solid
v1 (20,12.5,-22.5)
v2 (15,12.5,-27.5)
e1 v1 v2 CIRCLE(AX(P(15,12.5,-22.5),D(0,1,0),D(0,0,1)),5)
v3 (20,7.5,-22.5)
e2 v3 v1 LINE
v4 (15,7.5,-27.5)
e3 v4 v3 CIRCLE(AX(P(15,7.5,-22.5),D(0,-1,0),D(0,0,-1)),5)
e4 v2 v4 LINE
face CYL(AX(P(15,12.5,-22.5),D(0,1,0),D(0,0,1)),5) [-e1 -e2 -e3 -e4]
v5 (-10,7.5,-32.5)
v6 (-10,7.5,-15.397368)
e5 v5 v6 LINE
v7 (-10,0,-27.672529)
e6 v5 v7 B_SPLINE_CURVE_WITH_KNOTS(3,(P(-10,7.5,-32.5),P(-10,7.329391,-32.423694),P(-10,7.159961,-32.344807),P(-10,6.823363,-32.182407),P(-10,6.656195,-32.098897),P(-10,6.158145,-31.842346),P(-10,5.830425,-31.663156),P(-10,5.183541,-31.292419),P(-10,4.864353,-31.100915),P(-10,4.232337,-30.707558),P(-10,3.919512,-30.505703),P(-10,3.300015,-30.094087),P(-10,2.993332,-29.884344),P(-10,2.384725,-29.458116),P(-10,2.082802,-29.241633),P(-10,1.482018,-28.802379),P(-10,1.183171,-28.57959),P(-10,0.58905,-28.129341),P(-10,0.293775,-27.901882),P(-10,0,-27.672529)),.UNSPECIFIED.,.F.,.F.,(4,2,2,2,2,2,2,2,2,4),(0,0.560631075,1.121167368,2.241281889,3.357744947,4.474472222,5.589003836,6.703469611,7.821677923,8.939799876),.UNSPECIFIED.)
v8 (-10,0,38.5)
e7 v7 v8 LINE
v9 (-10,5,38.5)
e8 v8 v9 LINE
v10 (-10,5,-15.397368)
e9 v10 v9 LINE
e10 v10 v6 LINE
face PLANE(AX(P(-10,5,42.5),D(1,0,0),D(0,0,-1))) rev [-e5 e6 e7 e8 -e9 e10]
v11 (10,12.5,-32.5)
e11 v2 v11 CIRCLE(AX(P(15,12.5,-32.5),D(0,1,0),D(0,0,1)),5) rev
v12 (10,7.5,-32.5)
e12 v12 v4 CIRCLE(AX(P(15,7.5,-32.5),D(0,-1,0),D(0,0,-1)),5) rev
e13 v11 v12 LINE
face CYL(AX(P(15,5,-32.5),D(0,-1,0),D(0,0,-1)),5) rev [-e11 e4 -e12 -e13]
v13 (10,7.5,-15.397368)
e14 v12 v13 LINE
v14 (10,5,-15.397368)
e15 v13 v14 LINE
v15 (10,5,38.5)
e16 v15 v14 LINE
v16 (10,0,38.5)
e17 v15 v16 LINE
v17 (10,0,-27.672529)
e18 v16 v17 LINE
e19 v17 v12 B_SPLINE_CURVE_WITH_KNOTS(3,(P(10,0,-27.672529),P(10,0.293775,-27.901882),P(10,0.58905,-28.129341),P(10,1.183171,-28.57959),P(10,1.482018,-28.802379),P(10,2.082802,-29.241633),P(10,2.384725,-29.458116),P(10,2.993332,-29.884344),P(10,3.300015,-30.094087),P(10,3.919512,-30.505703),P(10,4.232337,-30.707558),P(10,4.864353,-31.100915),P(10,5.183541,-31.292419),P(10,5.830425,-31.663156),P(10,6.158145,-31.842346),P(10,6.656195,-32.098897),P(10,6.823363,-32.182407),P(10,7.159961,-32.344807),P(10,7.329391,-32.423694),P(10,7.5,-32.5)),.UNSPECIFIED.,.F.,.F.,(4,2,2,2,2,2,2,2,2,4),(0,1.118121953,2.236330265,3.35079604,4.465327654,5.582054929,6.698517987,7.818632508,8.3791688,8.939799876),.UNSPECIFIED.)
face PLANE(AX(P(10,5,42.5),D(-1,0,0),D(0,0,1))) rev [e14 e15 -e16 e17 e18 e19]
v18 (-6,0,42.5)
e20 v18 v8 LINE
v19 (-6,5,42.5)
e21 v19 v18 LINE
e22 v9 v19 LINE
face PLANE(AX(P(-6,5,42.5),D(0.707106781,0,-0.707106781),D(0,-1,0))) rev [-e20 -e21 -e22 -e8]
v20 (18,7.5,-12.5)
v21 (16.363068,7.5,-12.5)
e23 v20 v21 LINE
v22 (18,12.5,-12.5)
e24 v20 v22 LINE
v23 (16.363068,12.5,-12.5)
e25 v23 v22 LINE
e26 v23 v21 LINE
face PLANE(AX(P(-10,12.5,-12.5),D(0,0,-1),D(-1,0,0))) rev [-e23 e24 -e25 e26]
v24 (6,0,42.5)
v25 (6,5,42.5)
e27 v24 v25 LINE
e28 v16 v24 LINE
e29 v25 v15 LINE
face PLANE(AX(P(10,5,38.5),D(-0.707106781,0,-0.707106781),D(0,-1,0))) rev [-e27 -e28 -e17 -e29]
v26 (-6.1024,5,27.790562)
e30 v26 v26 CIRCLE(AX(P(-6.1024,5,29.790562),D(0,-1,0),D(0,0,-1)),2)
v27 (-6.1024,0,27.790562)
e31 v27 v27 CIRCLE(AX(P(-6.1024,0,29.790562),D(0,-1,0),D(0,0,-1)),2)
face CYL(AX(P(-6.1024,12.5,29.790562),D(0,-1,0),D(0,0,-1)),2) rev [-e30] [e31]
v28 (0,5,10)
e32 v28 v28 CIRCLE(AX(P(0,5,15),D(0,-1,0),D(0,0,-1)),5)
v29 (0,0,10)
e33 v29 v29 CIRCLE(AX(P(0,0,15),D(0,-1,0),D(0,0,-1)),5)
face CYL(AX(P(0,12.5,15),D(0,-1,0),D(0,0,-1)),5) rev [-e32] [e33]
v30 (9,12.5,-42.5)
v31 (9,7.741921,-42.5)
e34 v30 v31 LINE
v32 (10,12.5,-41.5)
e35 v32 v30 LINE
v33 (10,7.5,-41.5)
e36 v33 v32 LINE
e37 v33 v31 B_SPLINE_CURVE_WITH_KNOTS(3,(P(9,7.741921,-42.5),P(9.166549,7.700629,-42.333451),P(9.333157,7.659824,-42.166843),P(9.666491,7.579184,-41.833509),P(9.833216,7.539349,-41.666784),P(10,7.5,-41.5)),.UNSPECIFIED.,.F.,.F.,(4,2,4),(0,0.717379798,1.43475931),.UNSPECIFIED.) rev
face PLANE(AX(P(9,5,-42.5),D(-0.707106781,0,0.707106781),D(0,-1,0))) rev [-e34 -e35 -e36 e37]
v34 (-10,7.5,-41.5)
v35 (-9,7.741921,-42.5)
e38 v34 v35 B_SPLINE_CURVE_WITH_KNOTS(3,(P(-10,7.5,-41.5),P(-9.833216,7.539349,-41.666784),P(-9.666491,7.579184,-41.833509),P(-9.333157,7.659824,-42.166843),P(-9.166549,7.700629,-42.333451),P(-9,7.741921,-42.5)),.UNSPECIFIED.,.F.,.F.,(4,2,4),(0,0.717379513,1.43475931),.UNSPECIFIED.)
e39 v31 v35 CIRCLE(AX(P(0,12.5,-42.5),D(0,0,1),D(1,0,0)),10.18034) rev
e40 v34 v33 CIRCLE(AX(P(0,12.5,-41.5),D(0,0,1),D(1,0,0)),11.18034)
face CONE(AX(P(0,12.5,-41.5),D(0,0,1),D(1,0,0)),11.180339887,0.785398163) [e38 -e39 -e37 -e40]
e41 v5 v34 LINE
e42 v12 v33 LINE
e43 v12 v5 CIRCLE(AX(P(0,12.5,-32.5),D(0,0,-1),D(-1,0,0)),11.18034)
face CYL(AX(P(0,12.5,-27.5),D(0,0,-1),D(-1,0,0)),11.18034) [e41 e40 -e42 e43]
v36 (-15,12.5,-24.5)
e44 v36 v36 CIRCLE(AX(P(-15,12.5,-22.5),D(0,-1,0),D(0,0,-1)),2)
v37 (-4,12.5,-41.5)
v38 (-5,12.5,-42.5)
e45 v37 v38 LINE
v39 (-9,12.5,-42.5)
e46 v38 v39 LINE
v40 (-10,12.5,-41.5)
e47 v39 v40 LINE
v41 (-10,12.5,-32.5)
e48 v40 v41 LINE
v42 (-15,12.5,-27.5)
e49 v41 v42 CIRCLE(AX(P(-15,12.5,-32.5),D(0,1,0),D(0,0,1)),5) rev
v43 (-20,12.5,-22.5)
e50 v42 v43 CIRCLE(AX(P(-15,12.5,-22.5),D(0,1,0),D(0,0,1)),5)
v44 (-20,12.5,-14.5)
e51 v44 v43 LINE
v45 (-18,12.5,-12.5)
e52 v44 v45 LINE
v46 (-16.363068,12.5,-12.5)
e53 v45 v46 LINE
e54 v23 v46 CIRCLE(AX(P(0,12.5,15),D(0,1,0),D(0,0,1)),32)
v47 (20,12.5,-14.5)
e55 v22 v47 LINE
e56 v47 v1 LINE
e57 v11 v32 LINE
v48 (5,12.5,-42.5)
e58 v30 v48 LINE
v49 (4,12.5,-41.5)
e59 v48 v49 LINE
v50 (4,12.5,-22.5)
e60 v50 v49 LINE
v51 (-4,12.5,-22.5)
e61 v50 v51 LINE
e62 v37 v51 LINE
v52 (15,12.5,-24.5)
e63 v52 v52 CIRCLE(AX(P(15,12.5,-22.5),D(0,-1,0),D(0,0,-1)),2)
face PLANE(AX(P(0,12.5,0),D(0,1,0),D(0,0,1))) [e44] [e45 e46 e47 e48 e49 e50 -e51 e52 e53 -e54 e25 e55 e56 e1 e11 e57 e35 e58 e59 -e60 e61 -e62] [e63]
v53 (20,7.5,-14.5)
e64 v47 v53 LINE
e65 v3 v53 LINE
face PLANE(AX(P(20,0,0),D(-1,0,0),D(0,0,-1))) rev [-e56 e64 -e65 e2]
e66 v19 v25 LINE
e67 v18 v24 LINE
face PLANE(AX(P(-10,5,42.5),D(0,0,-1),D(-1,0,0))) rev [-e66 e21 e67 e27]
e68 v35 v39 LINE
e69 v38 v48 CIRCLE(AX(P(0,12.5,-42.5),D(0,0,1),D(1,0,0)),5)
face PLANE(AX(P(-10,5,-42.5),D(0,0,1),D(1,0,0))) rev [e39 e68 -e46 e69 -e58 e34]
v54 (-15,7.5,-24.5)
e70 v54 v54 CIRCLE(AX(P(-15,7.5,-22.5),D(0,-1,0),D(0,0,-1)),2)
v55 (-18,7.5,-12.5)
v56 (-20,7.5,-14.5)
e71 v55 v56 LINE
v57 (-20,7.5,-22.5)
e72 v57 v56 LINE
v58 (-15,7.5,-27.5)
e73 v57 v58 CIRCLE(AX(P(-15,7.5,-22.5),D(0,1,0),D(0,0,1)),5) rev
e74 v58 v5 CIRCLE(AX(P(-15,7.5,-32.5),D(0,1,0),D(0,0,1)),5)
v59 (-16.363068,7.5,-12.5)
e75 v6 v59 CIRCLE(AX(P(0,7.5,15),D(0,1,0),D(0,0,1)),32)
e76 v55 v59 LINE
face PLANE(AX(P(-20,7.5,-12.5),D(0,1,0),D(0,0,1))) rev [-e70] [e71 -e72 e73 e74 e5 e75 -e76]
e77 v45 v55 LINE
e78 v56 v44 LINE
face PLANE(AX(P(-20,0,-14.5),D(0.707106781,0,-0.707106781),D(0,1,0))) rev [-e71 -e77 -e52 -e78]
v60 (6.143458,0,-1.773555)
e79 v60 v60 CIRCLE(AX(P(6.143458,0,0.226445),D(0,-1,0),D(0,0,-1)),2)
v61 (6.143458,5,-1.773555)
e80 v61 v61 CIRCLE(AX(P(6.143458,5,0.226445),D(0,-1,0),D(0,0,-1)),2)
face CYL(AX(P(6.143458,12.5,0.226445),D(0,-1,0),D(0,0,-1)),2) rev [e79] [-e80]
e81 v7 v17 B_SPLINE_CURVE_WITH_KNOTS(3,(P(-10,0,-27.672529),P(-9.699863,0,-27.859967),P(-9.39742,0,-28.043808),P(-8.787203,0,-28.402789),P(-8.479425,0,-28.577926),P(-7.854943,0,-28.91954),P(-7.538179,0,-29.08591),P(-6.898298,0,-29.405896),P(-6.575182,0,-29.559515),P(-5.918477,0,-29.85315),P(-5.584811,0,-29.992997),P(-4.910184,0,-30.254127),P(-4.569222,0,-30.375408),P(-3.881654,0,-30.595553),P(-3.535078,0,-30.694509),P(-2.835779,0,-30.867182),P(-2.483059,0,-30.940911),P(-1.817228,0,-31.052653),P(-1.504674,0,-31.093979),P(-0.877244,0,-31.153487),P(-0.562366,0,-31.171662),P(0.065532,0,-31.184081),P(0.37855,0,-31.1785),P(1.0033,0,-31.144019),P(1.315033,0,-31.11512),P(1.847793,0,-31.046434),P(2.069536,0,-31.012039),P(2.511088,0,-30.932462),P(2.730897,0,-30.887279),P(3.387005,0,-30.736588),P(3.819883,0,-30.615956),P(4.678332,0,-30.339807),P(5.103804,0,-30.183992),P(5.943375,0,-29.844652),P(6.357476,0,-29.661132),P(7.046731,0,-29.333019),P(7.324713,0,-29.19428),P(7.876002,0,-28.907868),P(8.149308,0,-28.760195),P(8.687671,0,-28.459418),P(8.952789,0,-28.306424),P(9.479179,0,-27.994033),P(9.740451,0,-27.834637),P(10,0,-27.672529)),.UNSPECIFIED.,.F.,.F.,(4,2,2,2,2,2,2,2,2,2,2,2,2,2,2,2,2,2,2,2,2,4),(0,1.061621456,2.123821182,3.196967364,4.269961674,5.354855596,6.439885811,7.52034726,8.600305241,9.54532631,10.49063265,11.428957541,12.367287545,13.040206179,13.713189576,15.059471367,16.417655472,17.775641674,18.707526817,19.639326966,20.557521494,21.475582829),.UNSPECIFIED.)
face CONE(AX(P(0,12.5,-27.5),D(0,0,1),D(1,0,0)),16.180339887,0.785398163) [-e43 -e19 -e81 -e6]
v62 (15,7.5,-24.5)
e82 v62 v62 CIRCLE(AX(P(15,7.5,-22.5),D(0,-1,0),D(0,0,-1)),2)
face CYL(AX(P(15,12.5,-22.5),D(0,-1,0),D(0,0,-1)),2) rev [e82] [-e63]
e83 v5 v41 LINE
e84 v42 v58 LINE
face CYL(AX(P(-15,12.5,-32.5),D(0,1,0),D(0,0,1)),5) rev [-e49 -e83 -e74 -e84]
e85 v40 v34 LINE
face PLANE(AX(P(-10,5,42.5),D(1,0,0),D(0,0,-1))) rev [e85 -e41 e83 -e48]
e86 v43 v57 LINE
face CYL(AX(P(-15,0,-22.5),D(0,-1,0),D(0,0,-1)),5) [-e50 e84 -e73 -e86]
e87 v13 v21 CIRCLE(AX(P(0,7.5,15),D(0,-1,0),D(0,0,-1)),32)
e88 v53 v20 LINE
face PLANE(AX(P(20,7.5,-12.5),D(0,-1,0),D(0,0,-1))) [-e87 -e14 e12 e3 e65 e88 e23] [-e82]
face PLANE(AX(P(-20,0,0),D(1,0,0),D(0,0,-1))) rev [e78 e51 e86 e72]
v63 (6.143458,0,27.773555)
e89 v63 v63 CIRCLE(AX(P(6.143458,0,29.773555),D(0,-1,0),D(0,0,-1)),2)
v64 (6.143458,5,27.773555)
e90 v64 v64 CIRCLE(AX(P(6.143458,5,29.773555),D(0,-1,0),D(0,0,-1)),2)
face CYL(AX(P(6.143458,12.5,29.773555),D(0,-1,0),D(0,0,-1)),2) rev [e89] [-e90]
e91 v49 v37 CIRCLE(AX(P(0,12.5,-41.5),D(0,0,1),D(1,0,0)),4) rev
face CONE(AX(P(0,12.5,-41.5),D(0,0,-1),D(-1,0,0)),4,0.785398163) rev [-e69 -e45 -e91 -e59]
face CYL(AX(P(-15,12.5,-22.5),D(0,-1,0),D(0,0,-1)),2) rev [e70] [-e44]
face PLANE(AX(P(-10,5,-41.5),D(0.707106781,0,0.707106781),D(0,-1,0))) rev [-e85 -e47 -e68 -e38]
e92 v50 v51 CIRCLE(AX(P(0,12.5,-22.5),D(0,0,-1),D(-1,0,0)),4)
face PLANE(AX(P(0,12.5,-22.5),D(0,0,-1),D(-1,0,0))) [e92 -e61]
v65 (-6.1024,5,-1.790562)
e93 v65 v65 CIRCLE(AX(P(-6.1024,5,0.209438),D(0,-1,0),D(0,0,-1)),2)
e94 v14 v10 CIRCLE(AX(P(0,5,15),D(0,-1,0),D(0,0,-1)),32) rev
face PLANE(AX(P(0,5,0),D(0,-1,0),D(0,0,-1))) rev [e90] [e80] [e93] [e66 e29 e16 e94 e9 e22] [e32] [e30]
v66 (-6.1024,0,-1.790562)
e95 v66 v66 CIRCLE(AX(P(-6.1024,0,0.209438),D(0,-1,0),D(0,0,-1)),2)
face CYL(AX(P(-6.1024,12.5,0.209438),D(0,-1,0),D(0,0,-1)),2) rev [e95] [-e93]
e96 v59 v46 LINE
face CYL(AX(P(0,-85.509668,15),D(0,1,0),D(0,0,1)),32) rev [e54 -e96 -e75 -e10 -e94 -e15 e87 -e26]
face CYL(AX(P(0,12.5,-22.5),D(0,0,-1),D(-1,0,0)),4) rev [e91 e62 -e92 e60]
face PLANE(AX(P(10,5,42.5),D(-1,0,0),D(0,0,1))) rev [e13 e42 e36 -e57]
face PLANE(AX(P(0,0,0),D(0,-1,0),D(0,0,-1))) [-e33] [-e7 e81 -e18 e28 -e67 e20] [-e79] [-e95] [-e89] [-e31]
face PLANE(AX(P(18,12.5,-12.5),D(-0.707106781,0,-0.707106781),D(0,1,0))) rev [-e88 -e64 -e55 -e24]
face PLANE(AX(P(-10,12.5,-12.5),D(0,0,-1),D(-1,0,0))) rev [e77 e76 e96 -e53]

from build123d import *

# Parameters (mm, degrees)
SKETCH4_W           = 20
SKETCH4_H           = 85
BOSS_EXTRUDE6_DEPTH = 5
SKETCH5_W           = 20
SKETCH5_H           = 30
BOSS_EXTRUDE7_DEPTH = 7.5
SKETCH6_R           = 4
CUT_EXTRUDE1_DEPTH  = 20
SKETCH7_W           = 15
SKETCH7_H           = 5
BOSS_EXTRUDE8_DEPTH = 10
FILLET2_START       = 7.5
FILLET2_DEPTH       = 5
FILLET2_2_DEPTH     = 5
SKETCH8_R           = 2
CUT_EXTRUDE2_DEPTH  = 48.565743976
CUT_EXTRUDE4_DEPTH  = 15
CHAMFER4_SIZE       = 5
CHAMFER7_SIZE       = 1
CHAMFER8_SIZE       = 1
SKETCH10_R          = 2
SKETCH10_R_2        = 5
CUT_EXTRUDE5_DEPTH  = 49.605555238
CHAMFER9_SIZE       = 4
CUT_EXTRUDE6_REACH  = 50.606
SKETCH11_R          = 32
CHAMFER10_SIZE      = 2


with BuildPart() as part:
    # Sketch4 → Boss-Extrude6 (new body)
    with BuildSketch(Plane(origin=(0, 0, 0), x_dir=(1, 0, 0), z_dir=(0, 1, 0))):
        Rectangle(SKETCH4_W, SKETCH4_H)
    extrude(amount=BOSS_EXTRUDE6_DEPTH)

    # Sketch5 → Boss-Extrude7 (add)
    with BuildSketch(Plane(origin=(0, 5, 0), x_dir=(1, 0, 0), z_dir=(0, 1, 0))):
        with Locations((0, 27.5)):
            Rectangle(SKETCH5_W, SKETCH5_H)
    extrude(amount=BOSS_EXTRUDE7_DEPTH)

    # Sketch6 → Cut-Extrude1 (cut)
    with BuildSketch(Plane(origin=(0, 0, -42.5), x_dir=(-1, 0, 0), z_dir=(0, 0, -1))):
        with Locations((0, 12.5)):
            Circle(SKETCH6_R)
    extrude(amount=-CUT_EXTRUDE1_DEPTH, mode=Mode.SUBTRACT)

    # Sketch7 → Boss-Extrude8 (add)
    with BuildSketch(Plane.ZY.offset(10)):
        with Locations((-20, 10)):
            Rectangle(SKETCH7_W, SKETCH7_H)
    boss_extrude8 = extrude(amount=BOSS_EXTRUDE8_DEPTH)

    # Mirror1: Boss-Extrude8 across plane
    add(boss_extrude8.mirror(Plane(origin=(0, 0, 0), x_dir=(0, 0, 1), z_dir=(1, 0, 0))))

    # Fillet2: read off the stored shape, not the designer's step
    # Fillet2 outline → Fillet2 (cut)
    with BuildSketch(Plane(origin=(0, 0, 0), x_dir=(1, 0, 0), z_dir=(0, 1, 0)).offset(FILLET2_START)):
        with BuildLine():
            ThreePointArc((15, 27.5), (18.535533906, 26.035533906), (20, 22.5))
            Line((20, 22.5), (20, 27.5))
            Line((20, 27.5), (15, 27.5))
        make_face()
        with BuildLine():
            ThreePointArc((-20, 22.5), (-18.535533906, 26.035533906), (-15, 27.5))
            Line((-15, 27.5), (-20, 27.5))
            Line((-20, 27.5), (-20, 22.5))
        make_face()
    extrude(amount=FILLET2_DEPTH, mode=Mode.SUBTRACT)

    # Fillet2 2 outline → Fillet2 2 (add)
    with BuildSketch(Plane(origin=(0, 0, 0), x_dir=(1, 0, 0), z_dir=(0, 1, 0)).offset(FILLET2_START)):
        with BuildLine():
            Line((10, 27.5), (15, 27.5))
            ThreePointArc((15, 27.5), (11.464466094, 28.964466094), (10, 32.5))
            Line((10, 32.5), (10, 27.5))
        make_face()
        with BuildLine():
            ThreePointArc((-10, 32.5), (-11.464466094, 28.964466094), (-15, 27.5))
            Line((-15, 27.5), (-10, 27.5))
            Line((-10, 27.5), (-10, 32.5))
        make_face()
    extrude(amount=FILLET2_2_DEPTH)

    # Sketch8 → Cut-Extrude2 (cut, through all)
    with BuildSketch(Plane.XZ.offset(-7.5)):
        with Locations(Location((-15, -22.5, 0), (0, 0, 270))):
            Circle(SKETCH8_R)
        with Locations(Location((15, -22.5, 0), (0, 0, 270))):
            Circle(SKETCH8_R)
    extrude(amount=-CUT_EXTRUDE2_DEPTH, mode=Mode.SUBTRACT)

    # Sketch9 → Cut-Extrude4 (cut)
    with BuildSketch(Plane(origin=(0, 0, -42.5), x_dir=(-1, 0, 0), z_dir=(0, 0, -1))):
        with BuildLine():
            Line((-10, 7.5), (-10, 0))
            Line((-10, 0), (10, 0))
            Line((10, 0), (10, 7.5))
            ThreePointArc((10, 7.5), (0, 1.319660113), (-10, 7.5))
        make_face()
    extrude(amount=-CUT_EXTRUDE4_DEPTH, mode=Mode.SUBTRACT)

    # Chamfer4
    # the kernel refuses this chamfer: 5 mm, written as the material it adds along each edge
    with BuildSketch(Plane(origin=(0, 12.5, -27.5), x_dir=(-0.7729223177191435, 0.6345006625462793, 0), z_dir=(0.6345006625462793, 0.7729223177191435, 0))) as chamfer4_piece_1_section:
        Polygon((11.180339887 + CHAMFER4_SIZE, 0), (11.180339887, -CHAMFER4_SIZE), (11.180339887, 0), align=None)
    chamfer4_piece_1 = revolve(axis=Axis((0, 12.5, -27.5), (0, 0, 1)), revolution_arc=258.765918747, mode=Mode.PRIVATE)
    chamfer4_piece_1 = split(chamfer4_piece_1, bisect_by=Plane(origin=(-10, 12.5, -27.5), z_dir=(1, 0, 0)), keep=Keep.TOP, mode=Mode.PRIVATE)
    chamfer4_piece_1 = split(chamfer4_piece_1, bisect_by=Plane(origin=(10, 12.5, -27.5), z_dir=(-1, 0, 0)), keep=Keep.TOP, mode=Mode.PRIVATE)
    chamfer4_piece_1 = split(chamfer4_piece_1, bisect_by=Plane(origin=(0, 0, -27.5), z_dir=(0, 1, 0)), keep=Keep.TOP, mode=Mode.PRIVATE)
    chamfer4_piece_1 = split(chamfer4_piece_1, bisect_by=Plane(origin=(0, 12.5, -27.5), z_dir=(0, -1, 0)), keep=Keep.TOP, mode=Mode.PRIVATE)
    add(chamfer4_piece_1)

    # Chamfer7
    chamfer7_edges = [part.edges().sort_by_distance(p)[0] for p in [
        (0, 8.5, -42.5),
    ]]
    chamfer(chamfer7_edges, length=CHAMFER7_SIZE)

    # Chamfer8
    chamfer8_edges = [part.edges().sort_by_distance(p)[0] for p in [
        (0, 1.319660113, -42.5),
        (-10, 10, -42.5),
        (10, 10, -42.5),
    ]]
    chamfer(chamfer8_edges, length=CHAMFER8_SIZE)

    # Sketch10 → Cut-Extrude5 (cut, through all)
    with BuildSketch(Plane.XZ):
        with Locations(Location((-6.1024, 0.209438339, 0), (0, 0, 270))):
            Circle(SKETCH10_R)
        with Locations(Location((6.143458026, 0.226445131, 0), (0, 0, 270))):
            Circle(SKETCH10_R)
        with Locations(Location((6.143458026, 29.773554869, 0), (0, 0, 270))):
            Circle(SKETCH10_R)
        with Locations(Location((-6.1024, 29.790561661, 0), (0, 0, 270))):
            Circle(SKETCH10_R)
        with Locations(Location((0, 15, 0), (0, 0, 270))):
            Circle(SKETCH10_R_2)
    extrude(amount=-CUT_EXTRUDE5_DEPTH, mode=Mode.SUBTRACT)

    # Chamfer9
    chamfer9_edges = [part.edges().sort_by_distance(p)[0] for p in [
        (10, 2.5, 42.5),
        (-10, 2.5, 42.5),
    ]]
    chamfer(chamfer9_edges, length=CHAMFER9_SIZE)

    # Cut-Extrude6: up to this face of the body (flat: up to its plane)
    cut_extrude6_end = Plane(part.part.faces().sort_by_distance((-9.414765004, 5, 13))[0])
    # Sketch11 → Cut-Extrude6 (cut, up to the picked face)
    with BuildSketch(Plane(origin=(0, 12.5, 0), x_dir=(1, 0, 0), z_dir=(0, 1, 0)), mode=Mode.PRIVATE) as cut_extrude6_sk1:
        with Locations((0, -15)):
            Circle(SKETCH11_R)
    cut_extrude6_tool1 = split(extrude(cut_extrude6_sk1.sketch, amount=-CUT_EXTRUDE6_REACH, mode=Mode.PRIVATE), bisect_by=cut_extrude6_end, keep=Keep.BOTH, mode=Mode.PRIVATE)
    add(cut_extrude6_tool1.solids().sort_by(Axis((0, 12.5, 15), (0, -1, 0)))[0], mode=Mode.SUBTRACT)

    # Chamfer10
    chamfer10_edges = [part.edges().sort_by_distance(p)[0] for p in [
        (-20, 10, -12.5),
        (20, 10, -12.5),
    ]]
    chamfer(chamfer10_edges, length=CHAMFER10_SIZE)


solid = part.part
